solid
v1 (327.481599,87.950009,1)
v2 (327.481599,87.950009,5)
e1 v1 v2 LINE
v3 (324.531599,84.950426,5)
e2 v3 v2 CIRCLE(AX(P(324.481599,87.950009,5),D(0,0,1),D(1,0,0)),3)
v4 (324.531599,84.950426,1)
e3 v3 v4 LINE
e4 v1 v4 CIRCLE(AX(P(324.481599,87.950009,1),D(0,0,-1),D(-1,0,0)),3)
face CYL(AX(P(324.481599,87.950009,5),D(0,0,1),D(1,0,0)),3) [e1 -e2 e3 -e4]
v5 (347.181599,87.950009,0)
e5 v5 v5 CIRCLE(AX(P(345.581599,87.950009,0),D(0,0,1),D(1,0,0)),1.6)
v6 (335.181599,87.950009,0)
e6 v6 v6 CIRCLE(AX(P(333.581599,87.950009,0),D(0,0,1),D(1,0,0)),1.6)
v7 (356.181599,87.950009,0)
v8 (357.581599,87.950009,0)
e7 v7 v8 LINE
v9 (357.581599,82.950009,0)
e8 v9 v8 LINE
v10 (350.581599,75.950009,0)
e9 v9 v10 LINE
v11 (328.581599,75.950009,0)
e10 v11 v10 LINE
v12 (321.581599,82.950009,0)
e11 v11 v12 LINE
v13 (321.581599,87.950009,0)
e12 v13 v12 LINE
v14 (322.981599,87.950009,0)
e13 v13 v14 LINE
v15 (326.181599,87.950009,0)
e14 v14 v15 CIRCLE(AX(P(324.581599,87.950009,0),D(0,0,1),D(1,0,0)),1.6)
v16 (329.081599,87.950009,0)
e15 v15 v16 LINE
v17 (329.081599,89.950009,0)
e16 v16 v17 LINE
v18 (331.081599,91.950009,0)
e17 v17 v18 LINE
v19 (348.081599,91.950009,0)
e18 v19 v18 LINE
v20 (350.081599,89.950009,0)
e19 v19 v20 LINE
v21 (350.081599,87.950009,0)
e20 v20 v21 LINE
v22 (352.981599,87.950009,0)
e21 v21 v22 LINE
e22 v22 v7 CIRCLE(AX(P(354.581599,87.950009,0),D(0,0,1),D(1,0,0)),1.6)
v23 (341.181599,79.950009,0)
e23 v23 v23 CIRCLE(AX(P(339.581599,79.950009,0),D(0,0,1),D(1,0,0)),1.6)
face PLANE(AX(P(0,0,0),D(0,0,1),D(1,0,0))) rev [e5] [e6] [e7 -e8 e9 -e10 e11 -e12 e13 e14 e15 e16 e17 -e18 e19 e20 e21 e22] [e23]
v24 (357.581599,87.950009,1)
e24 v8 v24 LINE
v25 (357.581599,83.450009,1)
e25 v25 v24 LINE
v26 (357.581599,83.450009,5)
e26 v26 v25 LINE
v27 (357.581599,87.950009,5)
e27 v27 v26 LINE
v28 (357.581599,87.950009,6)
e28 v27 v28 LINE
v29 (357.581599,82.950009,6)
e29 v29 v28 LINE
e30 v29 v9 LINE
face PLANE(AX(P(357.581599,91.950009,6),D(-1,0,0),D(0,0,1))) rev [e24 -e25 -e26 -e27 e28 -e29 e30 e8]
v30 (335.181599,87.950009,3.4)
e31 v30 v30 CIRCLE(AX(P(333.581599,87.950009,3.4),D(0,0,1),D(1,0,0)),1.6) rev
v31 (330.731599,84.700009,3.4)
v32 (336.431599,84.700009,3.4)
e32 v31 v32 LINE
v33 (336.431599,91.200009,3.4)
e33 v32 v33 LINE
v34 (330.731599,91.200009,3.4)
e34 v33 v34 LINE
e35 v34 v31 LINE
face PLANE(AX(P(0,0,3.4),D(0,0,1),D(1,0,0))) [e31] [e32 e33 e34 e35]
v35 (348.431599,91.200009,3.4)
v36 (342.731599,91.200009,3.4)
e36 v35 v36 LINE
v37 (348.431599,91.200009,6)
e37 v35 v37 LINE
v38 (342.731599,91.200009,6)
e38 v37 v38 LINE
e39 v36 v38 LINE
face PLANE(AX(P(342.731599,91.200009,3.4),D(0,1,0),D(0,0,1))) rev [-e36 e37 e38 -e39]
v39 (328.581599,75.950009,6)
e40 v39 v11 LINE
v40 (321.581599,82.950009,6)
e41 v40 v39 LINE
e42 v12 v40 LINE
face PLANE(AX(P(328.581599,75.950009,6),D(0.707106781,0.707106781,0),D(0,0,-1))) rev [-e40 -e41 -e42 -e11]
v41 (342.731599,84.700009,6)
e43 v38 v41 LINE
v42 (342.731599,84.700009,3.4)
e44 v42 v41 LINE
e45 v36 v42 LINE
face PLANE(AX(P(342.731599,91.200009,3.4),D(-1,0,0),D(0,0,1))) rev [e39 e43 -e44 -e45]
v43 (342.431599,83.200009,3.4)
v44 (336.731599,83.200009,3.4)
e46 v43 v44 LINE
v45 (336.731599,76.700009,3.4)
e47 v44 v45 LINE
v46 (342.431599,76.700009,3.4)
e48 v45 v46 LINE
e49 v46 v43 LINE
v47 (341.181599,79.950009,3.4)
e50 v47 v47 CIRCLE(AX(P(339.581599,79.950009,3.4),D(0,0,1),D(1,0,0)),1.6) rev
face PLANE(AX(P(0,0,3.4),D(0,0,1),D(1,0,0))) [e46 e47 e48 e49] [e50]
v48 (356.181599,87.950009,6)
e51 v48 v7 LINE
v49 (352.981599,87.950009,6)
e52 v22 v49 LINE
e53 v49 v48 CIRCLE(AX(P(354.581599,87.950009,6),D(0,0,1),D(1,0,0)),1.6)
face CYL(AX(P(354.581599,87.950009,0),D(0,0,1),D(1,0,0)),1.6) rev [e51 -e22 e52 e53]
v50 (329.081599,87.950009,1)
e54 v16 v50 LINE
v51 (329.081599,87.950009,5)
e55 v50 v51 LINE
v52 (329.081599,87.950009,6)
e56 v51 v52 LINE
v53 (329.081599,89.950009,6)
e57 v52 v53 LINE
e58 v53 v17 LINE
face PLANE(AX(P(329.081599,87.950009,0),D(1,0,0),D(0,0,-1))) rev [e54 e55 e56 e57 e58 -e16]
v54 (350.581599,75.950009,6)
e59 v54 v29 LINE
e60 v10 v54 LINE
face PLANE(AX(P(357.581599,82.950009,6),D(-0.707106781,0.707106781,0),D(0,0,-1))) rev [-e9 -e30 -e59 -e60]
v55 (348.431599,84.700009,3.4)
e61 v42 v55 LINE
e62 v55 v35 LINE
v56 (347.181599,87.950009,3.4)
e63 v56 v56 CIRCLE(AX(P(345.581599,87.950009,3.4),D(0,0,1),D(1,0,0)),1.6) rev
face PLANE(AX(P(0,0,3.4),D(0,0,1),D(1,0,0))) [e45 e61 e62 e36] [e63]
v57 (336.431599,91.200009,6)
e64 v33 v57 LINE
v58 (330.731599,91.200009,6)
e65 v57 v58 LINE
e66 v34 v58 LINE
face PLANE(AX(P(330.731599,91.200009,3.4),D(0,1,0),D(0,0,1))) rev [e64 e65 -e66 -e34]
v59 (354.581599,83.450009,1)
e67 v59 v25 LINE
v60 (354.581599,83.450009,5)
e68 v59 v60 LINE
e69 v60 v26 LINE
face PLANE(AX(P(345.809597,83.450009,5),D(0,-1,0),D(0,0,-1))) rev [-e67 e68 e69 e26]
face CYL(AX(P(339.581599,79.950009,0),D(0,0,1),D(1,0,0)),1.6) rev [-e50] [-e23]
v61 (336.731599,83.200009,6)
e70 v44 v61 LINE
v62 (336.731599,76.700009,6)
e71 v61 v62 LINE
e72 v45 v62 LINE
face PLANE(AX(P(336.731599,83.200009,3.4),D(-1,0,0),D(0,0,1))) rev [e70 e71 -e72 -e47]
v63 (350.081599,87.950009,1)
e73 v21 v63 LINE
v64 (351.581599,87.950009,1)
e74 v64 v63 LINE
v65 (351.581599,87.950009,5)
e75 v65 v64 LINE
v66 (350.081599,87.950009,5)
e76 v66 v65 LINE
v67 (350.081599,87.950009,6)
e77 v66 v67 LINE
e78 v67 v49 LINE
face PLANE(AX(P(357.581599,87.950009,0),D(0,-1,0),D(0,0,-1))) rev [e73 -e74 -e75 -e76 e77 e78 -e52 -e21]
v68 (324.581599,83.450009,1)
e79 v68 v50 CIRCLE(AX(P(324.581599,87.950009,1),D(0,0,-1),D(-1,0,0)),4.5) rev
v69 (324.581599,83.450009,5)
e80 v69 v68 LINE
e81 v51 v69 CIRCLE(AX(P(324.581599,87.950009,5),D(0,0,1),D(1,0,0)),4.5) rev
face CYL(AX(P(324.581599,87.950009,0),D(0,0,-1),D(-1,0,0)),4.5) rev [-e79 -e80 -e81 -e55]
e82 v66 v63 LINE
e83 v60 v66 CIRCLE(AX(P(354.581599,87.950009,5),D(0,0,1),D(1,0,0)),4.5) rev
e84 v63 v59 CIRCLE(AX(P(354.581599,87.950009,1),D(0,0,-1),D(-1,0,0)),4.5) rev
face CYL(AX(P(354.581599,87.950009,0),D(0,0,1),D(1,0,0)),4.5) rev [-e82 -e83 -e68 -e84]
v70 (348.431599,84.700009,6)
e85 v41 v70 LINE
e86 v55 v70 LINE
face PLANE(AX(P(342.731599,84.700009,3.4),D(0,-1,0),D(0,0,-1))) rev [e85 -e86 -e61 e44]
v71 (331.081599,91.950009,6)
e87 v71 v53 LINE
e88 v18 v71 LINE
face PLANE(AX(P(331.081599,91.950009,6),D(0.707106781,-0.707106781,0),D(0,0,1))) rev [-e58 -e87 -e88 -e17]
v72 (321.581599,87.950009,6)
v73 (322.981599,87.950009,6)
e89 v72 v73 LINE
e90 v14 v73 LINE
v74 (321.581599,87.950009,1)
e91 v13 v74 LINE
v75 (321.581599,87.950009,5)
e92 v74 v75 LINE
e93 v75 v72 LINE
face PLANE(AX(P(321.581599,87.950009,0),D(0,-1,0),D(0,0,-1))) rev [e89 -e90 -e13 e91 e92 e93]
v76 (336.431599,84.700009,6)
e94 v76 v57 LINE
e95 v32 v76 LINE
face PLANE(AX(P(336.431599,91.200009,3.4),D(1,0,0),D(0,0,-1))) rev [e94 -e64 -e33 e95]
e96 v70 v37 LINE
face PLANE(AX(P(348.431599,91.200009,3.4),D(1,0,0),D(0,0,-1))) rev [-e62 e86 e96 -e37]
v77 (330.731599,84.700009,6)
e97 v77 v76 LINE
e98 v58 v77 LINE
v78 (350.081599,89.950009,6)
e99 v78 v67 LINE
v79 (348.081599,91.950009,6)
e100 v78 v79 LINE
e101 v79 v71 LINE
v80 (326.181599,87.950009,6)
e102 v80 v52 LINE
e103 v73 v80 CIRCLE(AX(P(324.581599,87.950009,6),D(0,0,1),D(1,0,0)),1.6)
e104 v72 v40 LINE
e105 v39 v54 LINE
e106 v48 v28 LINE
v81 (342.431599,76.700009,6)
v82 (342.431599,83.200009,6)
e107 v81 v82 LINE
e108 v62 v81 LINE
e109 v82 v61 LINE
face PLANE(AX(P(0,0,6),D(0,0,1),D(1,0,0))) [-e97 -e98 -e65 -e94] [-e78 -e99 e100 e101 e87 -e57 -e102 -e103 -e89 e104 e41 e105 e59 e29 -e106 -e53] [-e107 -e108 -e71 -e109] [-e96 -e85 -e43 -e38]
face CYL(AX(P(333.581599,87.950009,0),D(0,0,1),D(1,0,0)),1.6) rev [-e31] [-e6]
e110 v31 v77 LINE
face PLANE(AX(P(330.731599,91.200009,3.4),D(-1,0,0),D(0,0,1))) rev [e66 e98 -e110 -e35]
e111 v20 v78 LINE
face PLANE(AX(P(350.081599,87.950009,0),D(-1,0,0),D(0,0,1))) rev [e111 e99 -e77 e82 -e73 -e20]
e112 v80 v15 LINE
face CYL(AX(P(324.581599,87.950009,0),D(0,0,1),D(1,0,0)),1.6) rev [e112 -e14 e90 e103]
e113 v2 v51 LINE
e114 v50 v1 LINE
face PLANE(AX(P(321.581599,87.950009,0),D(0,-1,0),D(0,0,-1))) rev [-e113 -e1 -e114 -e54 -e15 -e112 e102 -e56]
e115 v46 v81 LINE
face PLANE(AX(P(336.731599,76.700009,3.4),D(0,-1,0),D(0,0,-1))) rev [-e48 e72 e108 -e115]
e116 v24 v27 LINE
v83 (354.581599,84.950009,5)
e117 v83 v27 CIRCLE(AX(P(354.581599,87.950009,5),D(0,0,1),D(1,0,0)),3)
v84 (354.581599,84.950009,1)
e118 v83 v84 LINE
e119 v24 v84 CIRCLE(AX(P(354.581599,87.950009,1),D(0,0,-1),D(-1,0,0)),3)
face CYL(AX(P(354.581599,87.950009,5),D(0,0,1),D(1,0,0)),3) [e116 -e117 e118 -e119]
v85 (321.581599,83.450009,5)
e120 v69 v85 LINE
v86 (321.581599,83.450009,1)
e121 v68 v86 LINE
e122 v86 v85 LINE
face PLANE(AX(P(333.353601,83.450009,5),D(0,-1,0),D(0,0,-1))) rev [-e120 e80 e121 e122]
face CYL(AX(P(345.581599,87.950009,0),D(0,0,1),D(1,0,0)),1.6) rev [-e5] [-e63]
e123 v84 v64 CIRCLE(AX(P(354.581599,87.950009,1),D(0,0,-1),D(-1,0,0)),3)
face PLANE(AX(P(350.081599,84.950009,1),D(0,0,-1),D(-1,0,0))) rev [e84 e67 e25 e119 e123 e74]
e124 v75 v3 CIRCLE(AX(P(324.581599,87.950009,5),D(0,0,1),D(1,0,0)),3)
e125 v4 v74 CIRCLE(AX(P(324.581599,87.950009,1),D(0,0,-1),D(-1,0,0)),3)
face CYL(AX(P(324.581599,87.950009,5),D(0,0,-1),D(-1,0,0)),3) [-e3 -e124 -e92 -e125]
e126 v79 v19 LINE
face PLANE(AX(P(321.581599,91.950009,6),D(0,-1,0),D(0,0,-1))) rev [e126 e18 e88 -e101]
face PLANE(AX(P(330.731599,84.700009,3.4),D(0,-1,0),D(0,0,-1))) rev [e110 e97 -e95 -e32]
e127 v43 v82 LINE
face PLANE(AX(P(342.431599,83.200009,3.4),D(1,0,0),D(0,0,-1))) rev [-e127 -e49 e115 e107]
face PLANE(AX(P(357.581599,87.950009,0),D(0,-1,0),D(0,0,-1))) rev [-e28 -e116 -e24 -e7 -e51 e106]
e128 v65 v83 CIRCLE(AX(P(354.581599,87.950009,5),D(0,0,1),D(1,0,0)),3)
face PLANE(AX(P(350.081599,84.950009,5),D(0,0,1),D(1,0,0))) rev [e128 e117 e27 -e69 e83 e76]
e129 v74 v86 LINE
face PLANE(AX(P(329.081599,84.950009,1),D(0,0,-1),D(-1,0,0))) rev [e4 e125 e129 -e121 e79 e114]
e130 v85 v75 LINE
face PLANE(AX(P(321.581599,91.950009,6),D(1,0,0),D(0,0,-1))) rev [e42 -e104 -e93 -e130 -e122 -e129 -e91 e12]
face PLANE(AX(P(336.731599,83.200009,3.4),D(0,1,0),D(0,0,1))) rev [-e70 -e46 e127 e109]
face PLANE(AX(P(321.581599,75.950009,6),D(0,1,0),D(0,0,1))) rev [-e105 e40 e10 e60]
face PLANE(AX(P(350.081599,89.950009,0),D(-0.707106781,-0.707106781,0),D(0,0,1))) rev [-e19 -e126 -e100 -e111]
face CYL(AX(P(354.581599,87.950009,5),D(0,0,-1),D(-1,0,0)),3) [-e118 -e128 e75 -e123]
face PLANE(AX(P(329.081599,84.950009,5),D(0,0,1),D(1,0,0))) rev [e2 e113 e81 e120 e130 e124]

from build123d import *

# Parameters (mm, degrees)
SKETCH1_W           = 36
SKETCH1_H           = 16
BOSS_EXTRUDE1_DEPTH = 6
SKETCH2_R           = 1.6
CUT_EXTRUDE1_DEPTH  = 6
CHAMFER1_SIZE       = 7
SKETCH4_R           = 1.6
CUT_EXTRUDE2_DEPTH  = 6
SKETCH5_W           = 7.5
SKETCH5_H           = 4
CUT_EXTRUDE3_DEPTH  = 6
CHAMFER2_SIZE       = 2
SKETCH6_W           = 1.6
SKETCH6_H           = 4
SKETCH6_W_2         = 1.5
CUT_EXTRUDE4_DEPTH  = 3
SKETCH7_W           = 4
SKETCH7_H           = 1.5
CUT_EXTRUDE6_DEPTH  = 7.5
FILLET1_R           = 3
FILLET2_R           = 3
SKETCH8_W           = 4
SKETCH8_H           = 1.5
CUT_EXTRUDE7_DEPTH  = 7.5
FILLET3_R           = 3
SKETCH10_W          = 5.7
SKETCH10_H          = 6.5
CUT_EXTRUDE8_DEPTH  = 2.6
FILLET4_R           = 4.5


# Some blends are built 0.0001 mm under size
with BuildPart() as part:
    # Sketch1 → Boss-Extrude1 (new body)
    with BuildSketch(Plane.XY):
        with Locations((339.581598667, 83.950008978)):
            Rectangle(SKETCH1_W, SKETCH1_H)
    extrude(amount=BOSS_EXTRUDE1_DEPTH)

    # Sketch2 → Cut-Extrude1 (cut)
    with BuildSketch(Plane.XY.offset(6)):
        with Locations((333.581598667, 87.950008978)):
            Circle(SKETCH2_R)
        with Locations((345.581598667, 87.950008978)):
            Circle(SKETCH2_R)
        with Locations((339.581598667, 79.950008978)):
            Circle(SKETCH2_R)
    extrude(amount=-CUT_EXTRUDE1_DEPTH, mode=Mode.SUBTRACT)

    # Chamfer1
    chamfer1_edges = [part.edges().sort_by_distance(p)[0] for p in [
        (357.581598667, 75.950008978, 3),
        (321.581598667, 75.950008978, 3),
    ]]
    chamfer(chamfer1_edges, length=CHAMFER1_SIZE)

    # Sketch4 → Cut-Extrude2 (cut)
    with BuildSketch(Plane.XY.offset(6)):
        with Locations((324.581598667, 87.950008978)):
            Circle(SKETCH4_R)
        with Locations((354.581598667, 87.950008978)):
            Circle(SKETCH4_R)
    extrude(amount=-CUT_EXTRUDE2_DEPTH, mode=Mode.SUBTRACT)

    # Sketch5 → Cut-Extrude3 (cut)
    with BuildSketch(Plane.XY.offset(6)):
        with Locations((325.331598667, 89.950008978)):
            Rectangle(SKETCH5_W, SKETCH5_H)
        with Locations((353.831598667, 89.950008978)):
            Rectangle(SKETCH5_W, SKETCH5_H)
    extrude(amount=-CUT_EXTRUDE3_DEPTH, mode=Mode.SUBTRACT)

    # Chamfer2
    chamfer2_edges = [part.edges().sort_by_distance(p)[0] for p in [
        (329.081598667, 91.950008978, 3),
        (350.081598667, 91.950008978, 3),
    ]]
    chamfer(chamfer2_edges, length=CHAMFER2_SIZE)

    # Sketch6 → Cut-Extrude4 (cut)
    with BuildSketch(Plane(origin=(0, 87.950008978, 0), x_dir=(1, 0, 0), z_dir=(0, 1, 0))):
        with Locations((328.281598667, -3)):
            Rectangle(SKETCH6_W, SKETCH6_H)
        with Locations((350.831598667, -3)):
            Rectangle(SKETCH6_W_2, SKETCH6_H)
    extrude(amount=-CUT_EXTRUDE4_DEPTH, mode=Mode.SUBTRACT)

    # Sketch7 → Cut-Extrude6 (cut)
    with BuildSketch(Plane(origin=(357.581598667, 0, 0), x_dir=(0, 0, -1), z_dir=(1, 0, 0))):
        with Locations((-3, 84.200008978)):
            Rectangle(SKETCH7_W, SKETCH7_H)
    extrude(amount=-CUT_EXTRUDE6_DEPTH, mode=Mode.SUBTRACT)

    # Fillet1
    fillet1_edges = [part.edges().sort_by_distance(p)[0] for p in [
        (351.581598667, 84.950008978, 3),
    ]]
    fillet(fillet1_edges, radius=FILLET1_R - 0.0001)  # a hair under: the kernel refuses the full size

    # Fillet2
    fillet2_edges = [part.edges().sort_by_distance(p)[0] for p in [
        (357.581598667, 84.950008978, 3),
    ]]
    fillet(fillet2_edges, radius=FILLET2_R - 0.0001)  # a hair under: the kernel refuses the full size

    # Sketch8 → Cut-Extrude7 (cut)
    with BuildSketch(Plane.ZY.offset(-321.581598667)):
        with Locations((3, 84.200008978)):
            Rectangle(SKETCH8_W, SKETCH8_H)
    extrude(amount=-CUT_EXTRUDE7_DEPTH, mode=Mode.SUBTRACT)

    # Fillet3
    # the kernel refuses this fillet: 3 mm, written as the material it takes off along each edge
    with BuildSketch(Plane(origin=(327.481598667, 84.950008978, 1), x_dir=(0, 1, 0), z_dir=(0, 0, 1)), Plane(origin=(321.581598667, 84.950008978, 5), x_dir=(0, 1, 0), z_dir=(0, 0, -1))) as fillet3_piece_1:
        with BuildLine():
            CenterArc((FILLET3_R, FILLET3_R), FILLET3_R, 180, 90)
            Line((0, FILLET3_R), (0, 0))
            Line((0, 0), (FILLET3_R, 0))
        make_face()
    extrude(amount=4, mode=Mode.SUBTRACT)

    # Sketch10 → Cut-Extrude8 (cut)
    with BuildSketch(Plane.XY.offset(6)):
        with Locations((333.581598667, 87.950008978)):
            Rectangle(SKETCH10_W, SKETCH10_H)
        with Locations((345.581598667, 87.950008978)):
            Rectangle(SKETCH10_W, SKETCH10_H)
        with Locations((339.581598667, 79.950008978)):
            Rectangle(SKETCH10_W, SKETCH10_H)
    extrude(amount=-CUT_EXTRUDE8_DEPTH, mode=Mode.SUBTRACT)

    # Fillet4
    fillet4_edges = [part.edges().sort_by_distance(p)[0] for p in [
        (350.081598667, 83.450008978, 3),
        (329.081598667, 83.450008978, 3),
    ]]
    fillet(fillet4_edges, radius=FILLET4_R)


solid = part.part
